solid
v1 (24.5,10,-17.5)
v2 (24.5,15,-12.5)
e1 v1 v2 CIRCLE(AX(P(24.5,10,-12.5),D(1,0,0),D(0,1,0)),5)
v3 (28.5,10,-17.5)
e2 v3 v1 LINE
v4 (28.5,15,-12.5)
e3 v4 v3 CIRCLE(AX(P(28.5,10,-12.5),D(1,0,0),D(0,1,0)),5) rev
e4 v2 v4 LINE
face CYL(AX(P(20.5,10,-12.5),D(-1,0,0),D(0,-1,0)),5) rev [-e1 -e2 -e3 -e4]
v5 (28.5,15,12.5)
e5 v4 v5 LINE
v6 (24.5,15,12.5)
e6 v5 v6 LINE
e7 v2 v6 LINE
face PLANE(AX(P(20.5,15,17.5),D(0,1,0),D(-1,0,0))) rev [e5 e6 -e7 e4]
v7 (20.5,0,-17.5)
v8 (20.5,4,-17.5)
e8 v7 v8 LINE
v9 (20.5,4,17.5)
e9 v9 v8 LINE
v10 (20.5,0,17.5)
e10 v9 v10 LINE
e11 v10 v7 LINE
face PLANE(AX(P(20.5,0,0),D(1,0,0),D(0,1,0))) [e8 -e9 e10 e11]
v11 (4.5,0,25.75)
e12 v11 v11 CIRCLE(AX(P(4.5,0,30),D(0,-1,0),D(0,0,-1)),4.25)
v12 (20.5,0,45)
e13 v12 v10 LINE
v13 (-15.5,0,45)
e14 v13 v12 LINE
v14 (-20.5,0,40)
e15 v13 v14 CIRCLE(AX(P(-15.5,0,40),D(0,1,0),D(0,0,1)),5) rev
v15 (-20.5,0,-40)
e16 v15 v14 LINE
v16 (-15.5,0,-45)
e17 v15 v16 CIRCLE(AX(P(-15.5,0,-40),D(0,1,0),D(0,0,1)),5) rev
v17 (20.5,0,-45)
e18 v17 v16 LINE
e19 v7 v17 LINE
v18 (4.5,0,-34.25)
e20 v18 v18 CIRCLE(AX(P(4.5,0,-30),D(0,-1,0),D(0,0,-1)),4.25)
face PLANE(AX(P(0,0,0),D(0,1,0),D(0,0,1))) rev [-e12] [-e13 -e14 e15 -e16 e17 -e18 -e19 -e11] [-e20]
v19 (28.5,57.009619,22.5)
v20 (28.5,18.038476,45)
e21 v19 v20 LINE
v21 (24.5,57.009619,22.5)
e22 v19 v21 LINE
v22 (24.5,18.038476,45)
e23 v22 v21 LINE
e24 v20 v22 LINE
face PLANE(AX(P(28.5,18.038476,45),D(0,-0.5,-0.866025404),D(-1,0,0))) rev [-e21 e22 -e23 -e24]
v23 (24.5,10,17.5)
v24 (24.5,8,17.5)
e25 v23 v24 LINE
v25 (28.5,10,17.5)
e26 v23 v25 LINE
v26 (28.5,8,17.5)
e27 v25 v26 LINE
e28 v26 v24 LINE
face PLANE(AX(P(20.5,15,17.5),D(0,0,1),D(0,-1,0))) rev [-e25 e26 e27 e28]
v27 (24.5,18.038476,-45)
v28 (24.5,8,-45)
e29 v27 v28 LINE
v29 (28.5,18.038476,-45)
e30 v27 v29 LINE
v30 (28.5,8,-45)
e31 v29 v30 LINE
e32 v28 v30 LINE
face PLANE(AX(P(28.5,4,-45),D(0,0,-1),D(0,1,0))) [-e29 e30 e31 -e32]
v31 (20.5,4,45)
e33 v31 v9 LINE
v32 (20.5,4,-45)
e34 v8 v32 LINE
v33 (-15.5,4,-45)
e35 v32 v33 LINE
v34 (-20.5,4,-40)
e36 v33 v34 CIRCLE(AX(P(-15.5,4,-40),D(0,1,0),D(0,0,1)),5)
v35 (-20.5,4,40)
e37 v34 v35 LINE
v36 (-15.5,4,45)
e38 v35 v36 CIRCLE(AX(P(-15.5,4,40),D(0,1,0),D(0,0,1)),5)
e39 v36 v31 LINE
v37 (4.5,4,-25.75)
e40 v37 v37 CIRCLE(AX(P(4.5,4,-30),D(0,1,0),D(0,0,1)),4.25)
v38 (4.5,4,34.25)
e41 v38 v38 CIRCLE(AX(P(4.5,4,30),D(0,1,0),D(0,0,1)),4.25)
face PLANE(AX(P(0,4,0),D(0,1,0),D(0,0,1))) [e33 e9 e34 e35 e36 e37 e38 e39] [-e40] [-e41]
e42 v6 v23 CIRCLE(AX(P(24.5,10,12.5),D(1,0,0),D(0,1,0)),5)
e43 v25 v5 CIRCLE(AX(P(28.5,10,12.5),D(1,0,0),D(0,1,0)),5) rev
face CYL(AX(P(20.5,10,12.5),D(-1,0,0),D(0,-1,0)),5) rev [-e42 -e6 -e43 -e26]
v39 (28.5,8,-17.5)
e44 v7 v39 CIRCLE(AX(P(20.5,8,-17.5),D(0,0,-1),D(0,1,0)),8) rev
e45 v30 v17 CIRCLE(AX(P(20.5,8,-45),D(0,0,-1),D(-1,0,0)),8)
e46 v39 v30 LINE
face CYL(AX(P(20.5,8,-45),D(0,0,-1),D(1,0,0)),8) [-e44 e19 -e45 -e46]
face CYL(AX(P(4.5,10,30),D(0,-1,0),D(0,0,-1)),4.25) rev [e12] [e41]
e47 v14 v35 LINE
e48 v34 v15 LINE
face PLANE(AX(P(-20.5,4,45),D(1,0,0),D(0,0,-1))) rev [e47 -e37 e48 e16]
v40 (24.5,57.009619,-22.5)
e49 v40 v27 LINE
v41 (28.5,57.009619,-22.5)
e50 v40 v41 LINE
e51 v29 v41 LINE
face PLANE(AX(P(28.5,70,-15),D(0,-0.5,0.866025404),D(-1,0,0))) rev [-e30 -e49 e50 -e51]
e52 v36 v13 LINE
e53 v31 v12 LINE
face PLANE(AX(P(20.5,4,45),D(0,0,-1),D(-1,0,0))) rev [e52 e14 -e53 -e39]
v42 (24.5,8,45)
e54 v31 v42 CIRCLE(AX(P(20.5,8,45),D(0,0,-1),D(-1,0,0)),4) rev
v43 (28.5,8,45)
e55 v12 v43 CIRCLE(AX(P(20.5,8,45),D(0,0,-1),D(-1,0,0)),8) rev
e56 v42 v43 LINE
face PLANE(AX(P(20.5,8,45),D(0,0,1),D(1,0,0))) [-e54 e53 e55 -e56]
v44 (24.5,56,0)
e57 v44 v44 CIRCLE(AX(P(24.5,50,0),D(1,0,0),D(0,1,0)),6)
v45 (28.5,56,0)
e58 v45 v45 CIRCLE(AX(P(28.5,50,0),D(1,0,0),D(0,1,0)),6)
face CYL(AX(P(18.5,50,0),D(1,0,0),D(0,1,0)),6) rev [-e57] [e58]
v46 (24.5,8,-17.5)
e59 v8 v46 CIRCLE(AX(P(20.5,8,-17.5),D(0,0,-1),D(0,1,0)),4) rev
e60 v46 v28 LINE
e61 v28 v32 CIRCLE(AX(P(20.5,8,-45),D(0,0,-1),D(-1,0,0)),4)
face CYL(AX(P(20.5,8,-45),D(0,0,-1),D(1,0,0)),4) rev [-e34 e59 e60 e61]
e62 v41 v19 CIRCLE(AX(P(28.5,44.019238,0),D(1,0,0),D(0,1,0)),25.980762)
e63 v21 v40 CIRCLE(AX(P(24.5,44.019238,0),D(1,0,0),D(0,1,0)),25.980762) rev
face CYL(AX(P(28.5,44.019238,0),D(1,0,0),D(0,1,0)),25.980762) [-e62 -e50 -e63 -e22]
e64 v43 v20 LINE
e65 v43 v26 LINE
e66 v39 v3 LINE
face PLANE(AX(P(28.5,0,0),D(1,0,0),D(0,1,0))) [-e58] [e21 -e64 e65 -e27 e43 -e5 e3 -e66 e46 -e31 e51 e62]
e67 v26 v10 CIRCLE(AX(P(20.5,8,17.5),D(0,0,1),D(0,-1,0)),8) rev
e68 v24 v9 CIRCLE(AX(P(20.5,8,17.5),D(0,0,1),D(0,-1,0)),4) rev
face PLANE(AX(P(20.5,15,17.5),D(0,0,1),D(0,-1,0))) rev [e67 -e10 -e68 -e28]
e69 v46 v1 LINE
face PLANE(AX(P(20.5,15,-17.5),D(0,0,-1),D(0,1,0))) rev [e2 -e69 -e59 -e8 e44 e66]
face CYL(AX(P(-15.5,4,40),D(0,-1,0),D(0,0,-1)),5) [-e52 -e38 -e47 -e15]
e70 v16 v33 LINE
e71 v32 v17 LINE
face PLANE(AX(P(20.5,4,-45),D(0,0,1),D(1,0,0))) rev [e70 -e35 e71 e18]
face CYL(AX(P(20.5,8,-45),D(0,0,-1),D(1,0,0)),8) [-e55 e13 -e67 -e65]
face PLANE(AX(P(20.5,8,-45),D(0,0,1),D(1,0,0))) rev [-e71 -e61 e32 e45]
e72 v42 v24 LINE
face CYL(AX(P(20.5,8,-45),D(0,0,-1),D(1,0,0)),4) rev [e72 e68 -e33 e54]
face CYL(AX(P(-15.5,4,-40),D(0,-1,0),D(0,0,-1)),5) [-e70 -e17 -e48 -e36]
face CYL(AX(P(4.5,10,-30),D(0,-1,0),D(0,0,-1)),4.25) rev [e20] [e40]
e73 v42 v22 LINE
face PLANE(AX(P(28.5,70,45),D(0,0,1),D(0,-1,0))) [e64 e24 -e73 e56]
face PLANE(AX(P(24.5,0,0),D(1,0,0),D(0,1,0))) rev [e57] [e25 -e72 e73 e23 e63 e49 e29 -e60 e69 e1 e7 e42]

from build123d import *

# Parameters (mm, degrees)
SKETCH_1_W             = 41
SKETCH_1_H             = 90
SM_BASE_FLANGE_1_DEPTH = 4
SM_EDGE_FLANGE_1_DEPTH = 90
SKETCH_9_R             = 4.25
CUT_EXTRUDE_1_DEPTH    = 10
SKETCH_11_R            = 6
CUT_EXTRUDE_2_DEPTH    = 10
SKETCH_12_W            = 35
SKETCH_12_H            = 15
CUT_EXTRUDE_3_DEPTH    = 8
CHAMFER_1_SIZE         = 30
CHAMFER_1_SIZE2        = 51.961524227
FILLET_1_R             = 25.980762
FILLET_2_R             = 5


# Sheet-metal steps are written as plain solids
with BuildPart() as part:
    # Sketch 1 → Базовая кромка1 (new body)
    with BuildSketch(Plane(origin=(0, 0, 0), x_dir=(1, 0, 0), z_dir=(0, 1, 0))):
        Rectangle(SKETCH_1_W, SKETCH_1_H)
    extrude(amount=SM_BASE_FLANGE_1_DEPTH)

    # Ребро-кромка1 section (across the edge) → Ребро-кромка1 (add)
    with BuildSketch(Plane(origin=(24.5, 4, 45), x_dir=(-1, 0, 0), z_dir=(0, 0, -1))):
        with BuildLine():
            Line((-4, 4), (-4, 66))
            Line((-4, 66), (0, 66))
            Line((0, 66), (0, 4))
            ThreePointArc((0, 4), (1.171572875, 1.171572875), (4, 0))
            Line((4, 0), (4, -4))
            ThreePointArc((4, -4), (-1.656854249, -1.656854249), (-4, 4))
        make_face()
    extrude(amount=SM_EDGE_FLANGE_1_DEPTH)

    # Эскиз9 → Вырез-Вытянуть1 (cut)
    with BuildSketch(Plane.XZ):
        with Locations(Location((4.5, 30, 0), (0, 0, 270))):
            Circle(SKETCH_9_R)
        with Locations(Location((4.5, -30, 0), (0, 0, 270))):
            Circle(SKETCH_9_R)
    extrude(amount=-CUT_EXTRUDE_1_DEPTH, mode=Mode.SUBTRACT)

    # Эскиз11 → Вырез-Вытянуть2 (cut)
    with BuildSketch(Plane(origin=(28.5, 0, 0), x_dir=(0, 0, -1), z_dir=(1, 0, 0))):
        with Locations(Location((0, 50, 0), (0, 0, 90))):
            Circle(SKETCH_11_R)
    extrude(amount=-CUT_EXTRUDE_2_DEPTH, mode=Mode.SUBTRACT)

    # Эскиз12 → Вырез-Вытянуть3 (cut)
    with BuildSketch(Plane(origin=(28.5, 0, 0), x_dir=(0, 0, -1), z_dir=(1, 0, 0))):
        with Locations((0, 7.5)):
            Rectangle(SKETCH_12_W, SKETCH_12_H)
    extrude(amount=-CUT_EXTRUDE_3_DEPTH, mode=Mode.SUBTRACT)

    # Фаска1
    chamfer_1_edges = [part.edges().sort_by_distance(p)[0] for p in [
        (26.5, 70, 45),
        (26.5, 70, -45),
    ]]
    chamfer_1_side = [part.faces().sort_by_distance(p)[0] for p in [
        (26.5, 70, 0),
    ]]
    chamfer(chamfer_1_edges, length=CHAMFER_1_SIZE, length2=CHAMFER_1_SIZE2, reference=chamfer_1_side[0])

    # Скругление1
    fillet_1_edges = [part.edges().sort_by_distance(p)[0] for p in [
        (26.5, 70, -15),
        (26.5, 70, 15),
    ]]
    fillet(fillet_1_edges, radius=FILLET_1_R)

    # Скругление2
    fillet_2_edges = [part.edges().sort_by_distance(p)[0] for p in [
        (26.5, 15, 17.5),
        (26.5, 15, -17.5),
        (-20.5, 2, -45),
        (-20.5, 2, 45),
    ]]
    fillet(fillet_2_edges, radius=FILLET_2_R)


solid = part.part
